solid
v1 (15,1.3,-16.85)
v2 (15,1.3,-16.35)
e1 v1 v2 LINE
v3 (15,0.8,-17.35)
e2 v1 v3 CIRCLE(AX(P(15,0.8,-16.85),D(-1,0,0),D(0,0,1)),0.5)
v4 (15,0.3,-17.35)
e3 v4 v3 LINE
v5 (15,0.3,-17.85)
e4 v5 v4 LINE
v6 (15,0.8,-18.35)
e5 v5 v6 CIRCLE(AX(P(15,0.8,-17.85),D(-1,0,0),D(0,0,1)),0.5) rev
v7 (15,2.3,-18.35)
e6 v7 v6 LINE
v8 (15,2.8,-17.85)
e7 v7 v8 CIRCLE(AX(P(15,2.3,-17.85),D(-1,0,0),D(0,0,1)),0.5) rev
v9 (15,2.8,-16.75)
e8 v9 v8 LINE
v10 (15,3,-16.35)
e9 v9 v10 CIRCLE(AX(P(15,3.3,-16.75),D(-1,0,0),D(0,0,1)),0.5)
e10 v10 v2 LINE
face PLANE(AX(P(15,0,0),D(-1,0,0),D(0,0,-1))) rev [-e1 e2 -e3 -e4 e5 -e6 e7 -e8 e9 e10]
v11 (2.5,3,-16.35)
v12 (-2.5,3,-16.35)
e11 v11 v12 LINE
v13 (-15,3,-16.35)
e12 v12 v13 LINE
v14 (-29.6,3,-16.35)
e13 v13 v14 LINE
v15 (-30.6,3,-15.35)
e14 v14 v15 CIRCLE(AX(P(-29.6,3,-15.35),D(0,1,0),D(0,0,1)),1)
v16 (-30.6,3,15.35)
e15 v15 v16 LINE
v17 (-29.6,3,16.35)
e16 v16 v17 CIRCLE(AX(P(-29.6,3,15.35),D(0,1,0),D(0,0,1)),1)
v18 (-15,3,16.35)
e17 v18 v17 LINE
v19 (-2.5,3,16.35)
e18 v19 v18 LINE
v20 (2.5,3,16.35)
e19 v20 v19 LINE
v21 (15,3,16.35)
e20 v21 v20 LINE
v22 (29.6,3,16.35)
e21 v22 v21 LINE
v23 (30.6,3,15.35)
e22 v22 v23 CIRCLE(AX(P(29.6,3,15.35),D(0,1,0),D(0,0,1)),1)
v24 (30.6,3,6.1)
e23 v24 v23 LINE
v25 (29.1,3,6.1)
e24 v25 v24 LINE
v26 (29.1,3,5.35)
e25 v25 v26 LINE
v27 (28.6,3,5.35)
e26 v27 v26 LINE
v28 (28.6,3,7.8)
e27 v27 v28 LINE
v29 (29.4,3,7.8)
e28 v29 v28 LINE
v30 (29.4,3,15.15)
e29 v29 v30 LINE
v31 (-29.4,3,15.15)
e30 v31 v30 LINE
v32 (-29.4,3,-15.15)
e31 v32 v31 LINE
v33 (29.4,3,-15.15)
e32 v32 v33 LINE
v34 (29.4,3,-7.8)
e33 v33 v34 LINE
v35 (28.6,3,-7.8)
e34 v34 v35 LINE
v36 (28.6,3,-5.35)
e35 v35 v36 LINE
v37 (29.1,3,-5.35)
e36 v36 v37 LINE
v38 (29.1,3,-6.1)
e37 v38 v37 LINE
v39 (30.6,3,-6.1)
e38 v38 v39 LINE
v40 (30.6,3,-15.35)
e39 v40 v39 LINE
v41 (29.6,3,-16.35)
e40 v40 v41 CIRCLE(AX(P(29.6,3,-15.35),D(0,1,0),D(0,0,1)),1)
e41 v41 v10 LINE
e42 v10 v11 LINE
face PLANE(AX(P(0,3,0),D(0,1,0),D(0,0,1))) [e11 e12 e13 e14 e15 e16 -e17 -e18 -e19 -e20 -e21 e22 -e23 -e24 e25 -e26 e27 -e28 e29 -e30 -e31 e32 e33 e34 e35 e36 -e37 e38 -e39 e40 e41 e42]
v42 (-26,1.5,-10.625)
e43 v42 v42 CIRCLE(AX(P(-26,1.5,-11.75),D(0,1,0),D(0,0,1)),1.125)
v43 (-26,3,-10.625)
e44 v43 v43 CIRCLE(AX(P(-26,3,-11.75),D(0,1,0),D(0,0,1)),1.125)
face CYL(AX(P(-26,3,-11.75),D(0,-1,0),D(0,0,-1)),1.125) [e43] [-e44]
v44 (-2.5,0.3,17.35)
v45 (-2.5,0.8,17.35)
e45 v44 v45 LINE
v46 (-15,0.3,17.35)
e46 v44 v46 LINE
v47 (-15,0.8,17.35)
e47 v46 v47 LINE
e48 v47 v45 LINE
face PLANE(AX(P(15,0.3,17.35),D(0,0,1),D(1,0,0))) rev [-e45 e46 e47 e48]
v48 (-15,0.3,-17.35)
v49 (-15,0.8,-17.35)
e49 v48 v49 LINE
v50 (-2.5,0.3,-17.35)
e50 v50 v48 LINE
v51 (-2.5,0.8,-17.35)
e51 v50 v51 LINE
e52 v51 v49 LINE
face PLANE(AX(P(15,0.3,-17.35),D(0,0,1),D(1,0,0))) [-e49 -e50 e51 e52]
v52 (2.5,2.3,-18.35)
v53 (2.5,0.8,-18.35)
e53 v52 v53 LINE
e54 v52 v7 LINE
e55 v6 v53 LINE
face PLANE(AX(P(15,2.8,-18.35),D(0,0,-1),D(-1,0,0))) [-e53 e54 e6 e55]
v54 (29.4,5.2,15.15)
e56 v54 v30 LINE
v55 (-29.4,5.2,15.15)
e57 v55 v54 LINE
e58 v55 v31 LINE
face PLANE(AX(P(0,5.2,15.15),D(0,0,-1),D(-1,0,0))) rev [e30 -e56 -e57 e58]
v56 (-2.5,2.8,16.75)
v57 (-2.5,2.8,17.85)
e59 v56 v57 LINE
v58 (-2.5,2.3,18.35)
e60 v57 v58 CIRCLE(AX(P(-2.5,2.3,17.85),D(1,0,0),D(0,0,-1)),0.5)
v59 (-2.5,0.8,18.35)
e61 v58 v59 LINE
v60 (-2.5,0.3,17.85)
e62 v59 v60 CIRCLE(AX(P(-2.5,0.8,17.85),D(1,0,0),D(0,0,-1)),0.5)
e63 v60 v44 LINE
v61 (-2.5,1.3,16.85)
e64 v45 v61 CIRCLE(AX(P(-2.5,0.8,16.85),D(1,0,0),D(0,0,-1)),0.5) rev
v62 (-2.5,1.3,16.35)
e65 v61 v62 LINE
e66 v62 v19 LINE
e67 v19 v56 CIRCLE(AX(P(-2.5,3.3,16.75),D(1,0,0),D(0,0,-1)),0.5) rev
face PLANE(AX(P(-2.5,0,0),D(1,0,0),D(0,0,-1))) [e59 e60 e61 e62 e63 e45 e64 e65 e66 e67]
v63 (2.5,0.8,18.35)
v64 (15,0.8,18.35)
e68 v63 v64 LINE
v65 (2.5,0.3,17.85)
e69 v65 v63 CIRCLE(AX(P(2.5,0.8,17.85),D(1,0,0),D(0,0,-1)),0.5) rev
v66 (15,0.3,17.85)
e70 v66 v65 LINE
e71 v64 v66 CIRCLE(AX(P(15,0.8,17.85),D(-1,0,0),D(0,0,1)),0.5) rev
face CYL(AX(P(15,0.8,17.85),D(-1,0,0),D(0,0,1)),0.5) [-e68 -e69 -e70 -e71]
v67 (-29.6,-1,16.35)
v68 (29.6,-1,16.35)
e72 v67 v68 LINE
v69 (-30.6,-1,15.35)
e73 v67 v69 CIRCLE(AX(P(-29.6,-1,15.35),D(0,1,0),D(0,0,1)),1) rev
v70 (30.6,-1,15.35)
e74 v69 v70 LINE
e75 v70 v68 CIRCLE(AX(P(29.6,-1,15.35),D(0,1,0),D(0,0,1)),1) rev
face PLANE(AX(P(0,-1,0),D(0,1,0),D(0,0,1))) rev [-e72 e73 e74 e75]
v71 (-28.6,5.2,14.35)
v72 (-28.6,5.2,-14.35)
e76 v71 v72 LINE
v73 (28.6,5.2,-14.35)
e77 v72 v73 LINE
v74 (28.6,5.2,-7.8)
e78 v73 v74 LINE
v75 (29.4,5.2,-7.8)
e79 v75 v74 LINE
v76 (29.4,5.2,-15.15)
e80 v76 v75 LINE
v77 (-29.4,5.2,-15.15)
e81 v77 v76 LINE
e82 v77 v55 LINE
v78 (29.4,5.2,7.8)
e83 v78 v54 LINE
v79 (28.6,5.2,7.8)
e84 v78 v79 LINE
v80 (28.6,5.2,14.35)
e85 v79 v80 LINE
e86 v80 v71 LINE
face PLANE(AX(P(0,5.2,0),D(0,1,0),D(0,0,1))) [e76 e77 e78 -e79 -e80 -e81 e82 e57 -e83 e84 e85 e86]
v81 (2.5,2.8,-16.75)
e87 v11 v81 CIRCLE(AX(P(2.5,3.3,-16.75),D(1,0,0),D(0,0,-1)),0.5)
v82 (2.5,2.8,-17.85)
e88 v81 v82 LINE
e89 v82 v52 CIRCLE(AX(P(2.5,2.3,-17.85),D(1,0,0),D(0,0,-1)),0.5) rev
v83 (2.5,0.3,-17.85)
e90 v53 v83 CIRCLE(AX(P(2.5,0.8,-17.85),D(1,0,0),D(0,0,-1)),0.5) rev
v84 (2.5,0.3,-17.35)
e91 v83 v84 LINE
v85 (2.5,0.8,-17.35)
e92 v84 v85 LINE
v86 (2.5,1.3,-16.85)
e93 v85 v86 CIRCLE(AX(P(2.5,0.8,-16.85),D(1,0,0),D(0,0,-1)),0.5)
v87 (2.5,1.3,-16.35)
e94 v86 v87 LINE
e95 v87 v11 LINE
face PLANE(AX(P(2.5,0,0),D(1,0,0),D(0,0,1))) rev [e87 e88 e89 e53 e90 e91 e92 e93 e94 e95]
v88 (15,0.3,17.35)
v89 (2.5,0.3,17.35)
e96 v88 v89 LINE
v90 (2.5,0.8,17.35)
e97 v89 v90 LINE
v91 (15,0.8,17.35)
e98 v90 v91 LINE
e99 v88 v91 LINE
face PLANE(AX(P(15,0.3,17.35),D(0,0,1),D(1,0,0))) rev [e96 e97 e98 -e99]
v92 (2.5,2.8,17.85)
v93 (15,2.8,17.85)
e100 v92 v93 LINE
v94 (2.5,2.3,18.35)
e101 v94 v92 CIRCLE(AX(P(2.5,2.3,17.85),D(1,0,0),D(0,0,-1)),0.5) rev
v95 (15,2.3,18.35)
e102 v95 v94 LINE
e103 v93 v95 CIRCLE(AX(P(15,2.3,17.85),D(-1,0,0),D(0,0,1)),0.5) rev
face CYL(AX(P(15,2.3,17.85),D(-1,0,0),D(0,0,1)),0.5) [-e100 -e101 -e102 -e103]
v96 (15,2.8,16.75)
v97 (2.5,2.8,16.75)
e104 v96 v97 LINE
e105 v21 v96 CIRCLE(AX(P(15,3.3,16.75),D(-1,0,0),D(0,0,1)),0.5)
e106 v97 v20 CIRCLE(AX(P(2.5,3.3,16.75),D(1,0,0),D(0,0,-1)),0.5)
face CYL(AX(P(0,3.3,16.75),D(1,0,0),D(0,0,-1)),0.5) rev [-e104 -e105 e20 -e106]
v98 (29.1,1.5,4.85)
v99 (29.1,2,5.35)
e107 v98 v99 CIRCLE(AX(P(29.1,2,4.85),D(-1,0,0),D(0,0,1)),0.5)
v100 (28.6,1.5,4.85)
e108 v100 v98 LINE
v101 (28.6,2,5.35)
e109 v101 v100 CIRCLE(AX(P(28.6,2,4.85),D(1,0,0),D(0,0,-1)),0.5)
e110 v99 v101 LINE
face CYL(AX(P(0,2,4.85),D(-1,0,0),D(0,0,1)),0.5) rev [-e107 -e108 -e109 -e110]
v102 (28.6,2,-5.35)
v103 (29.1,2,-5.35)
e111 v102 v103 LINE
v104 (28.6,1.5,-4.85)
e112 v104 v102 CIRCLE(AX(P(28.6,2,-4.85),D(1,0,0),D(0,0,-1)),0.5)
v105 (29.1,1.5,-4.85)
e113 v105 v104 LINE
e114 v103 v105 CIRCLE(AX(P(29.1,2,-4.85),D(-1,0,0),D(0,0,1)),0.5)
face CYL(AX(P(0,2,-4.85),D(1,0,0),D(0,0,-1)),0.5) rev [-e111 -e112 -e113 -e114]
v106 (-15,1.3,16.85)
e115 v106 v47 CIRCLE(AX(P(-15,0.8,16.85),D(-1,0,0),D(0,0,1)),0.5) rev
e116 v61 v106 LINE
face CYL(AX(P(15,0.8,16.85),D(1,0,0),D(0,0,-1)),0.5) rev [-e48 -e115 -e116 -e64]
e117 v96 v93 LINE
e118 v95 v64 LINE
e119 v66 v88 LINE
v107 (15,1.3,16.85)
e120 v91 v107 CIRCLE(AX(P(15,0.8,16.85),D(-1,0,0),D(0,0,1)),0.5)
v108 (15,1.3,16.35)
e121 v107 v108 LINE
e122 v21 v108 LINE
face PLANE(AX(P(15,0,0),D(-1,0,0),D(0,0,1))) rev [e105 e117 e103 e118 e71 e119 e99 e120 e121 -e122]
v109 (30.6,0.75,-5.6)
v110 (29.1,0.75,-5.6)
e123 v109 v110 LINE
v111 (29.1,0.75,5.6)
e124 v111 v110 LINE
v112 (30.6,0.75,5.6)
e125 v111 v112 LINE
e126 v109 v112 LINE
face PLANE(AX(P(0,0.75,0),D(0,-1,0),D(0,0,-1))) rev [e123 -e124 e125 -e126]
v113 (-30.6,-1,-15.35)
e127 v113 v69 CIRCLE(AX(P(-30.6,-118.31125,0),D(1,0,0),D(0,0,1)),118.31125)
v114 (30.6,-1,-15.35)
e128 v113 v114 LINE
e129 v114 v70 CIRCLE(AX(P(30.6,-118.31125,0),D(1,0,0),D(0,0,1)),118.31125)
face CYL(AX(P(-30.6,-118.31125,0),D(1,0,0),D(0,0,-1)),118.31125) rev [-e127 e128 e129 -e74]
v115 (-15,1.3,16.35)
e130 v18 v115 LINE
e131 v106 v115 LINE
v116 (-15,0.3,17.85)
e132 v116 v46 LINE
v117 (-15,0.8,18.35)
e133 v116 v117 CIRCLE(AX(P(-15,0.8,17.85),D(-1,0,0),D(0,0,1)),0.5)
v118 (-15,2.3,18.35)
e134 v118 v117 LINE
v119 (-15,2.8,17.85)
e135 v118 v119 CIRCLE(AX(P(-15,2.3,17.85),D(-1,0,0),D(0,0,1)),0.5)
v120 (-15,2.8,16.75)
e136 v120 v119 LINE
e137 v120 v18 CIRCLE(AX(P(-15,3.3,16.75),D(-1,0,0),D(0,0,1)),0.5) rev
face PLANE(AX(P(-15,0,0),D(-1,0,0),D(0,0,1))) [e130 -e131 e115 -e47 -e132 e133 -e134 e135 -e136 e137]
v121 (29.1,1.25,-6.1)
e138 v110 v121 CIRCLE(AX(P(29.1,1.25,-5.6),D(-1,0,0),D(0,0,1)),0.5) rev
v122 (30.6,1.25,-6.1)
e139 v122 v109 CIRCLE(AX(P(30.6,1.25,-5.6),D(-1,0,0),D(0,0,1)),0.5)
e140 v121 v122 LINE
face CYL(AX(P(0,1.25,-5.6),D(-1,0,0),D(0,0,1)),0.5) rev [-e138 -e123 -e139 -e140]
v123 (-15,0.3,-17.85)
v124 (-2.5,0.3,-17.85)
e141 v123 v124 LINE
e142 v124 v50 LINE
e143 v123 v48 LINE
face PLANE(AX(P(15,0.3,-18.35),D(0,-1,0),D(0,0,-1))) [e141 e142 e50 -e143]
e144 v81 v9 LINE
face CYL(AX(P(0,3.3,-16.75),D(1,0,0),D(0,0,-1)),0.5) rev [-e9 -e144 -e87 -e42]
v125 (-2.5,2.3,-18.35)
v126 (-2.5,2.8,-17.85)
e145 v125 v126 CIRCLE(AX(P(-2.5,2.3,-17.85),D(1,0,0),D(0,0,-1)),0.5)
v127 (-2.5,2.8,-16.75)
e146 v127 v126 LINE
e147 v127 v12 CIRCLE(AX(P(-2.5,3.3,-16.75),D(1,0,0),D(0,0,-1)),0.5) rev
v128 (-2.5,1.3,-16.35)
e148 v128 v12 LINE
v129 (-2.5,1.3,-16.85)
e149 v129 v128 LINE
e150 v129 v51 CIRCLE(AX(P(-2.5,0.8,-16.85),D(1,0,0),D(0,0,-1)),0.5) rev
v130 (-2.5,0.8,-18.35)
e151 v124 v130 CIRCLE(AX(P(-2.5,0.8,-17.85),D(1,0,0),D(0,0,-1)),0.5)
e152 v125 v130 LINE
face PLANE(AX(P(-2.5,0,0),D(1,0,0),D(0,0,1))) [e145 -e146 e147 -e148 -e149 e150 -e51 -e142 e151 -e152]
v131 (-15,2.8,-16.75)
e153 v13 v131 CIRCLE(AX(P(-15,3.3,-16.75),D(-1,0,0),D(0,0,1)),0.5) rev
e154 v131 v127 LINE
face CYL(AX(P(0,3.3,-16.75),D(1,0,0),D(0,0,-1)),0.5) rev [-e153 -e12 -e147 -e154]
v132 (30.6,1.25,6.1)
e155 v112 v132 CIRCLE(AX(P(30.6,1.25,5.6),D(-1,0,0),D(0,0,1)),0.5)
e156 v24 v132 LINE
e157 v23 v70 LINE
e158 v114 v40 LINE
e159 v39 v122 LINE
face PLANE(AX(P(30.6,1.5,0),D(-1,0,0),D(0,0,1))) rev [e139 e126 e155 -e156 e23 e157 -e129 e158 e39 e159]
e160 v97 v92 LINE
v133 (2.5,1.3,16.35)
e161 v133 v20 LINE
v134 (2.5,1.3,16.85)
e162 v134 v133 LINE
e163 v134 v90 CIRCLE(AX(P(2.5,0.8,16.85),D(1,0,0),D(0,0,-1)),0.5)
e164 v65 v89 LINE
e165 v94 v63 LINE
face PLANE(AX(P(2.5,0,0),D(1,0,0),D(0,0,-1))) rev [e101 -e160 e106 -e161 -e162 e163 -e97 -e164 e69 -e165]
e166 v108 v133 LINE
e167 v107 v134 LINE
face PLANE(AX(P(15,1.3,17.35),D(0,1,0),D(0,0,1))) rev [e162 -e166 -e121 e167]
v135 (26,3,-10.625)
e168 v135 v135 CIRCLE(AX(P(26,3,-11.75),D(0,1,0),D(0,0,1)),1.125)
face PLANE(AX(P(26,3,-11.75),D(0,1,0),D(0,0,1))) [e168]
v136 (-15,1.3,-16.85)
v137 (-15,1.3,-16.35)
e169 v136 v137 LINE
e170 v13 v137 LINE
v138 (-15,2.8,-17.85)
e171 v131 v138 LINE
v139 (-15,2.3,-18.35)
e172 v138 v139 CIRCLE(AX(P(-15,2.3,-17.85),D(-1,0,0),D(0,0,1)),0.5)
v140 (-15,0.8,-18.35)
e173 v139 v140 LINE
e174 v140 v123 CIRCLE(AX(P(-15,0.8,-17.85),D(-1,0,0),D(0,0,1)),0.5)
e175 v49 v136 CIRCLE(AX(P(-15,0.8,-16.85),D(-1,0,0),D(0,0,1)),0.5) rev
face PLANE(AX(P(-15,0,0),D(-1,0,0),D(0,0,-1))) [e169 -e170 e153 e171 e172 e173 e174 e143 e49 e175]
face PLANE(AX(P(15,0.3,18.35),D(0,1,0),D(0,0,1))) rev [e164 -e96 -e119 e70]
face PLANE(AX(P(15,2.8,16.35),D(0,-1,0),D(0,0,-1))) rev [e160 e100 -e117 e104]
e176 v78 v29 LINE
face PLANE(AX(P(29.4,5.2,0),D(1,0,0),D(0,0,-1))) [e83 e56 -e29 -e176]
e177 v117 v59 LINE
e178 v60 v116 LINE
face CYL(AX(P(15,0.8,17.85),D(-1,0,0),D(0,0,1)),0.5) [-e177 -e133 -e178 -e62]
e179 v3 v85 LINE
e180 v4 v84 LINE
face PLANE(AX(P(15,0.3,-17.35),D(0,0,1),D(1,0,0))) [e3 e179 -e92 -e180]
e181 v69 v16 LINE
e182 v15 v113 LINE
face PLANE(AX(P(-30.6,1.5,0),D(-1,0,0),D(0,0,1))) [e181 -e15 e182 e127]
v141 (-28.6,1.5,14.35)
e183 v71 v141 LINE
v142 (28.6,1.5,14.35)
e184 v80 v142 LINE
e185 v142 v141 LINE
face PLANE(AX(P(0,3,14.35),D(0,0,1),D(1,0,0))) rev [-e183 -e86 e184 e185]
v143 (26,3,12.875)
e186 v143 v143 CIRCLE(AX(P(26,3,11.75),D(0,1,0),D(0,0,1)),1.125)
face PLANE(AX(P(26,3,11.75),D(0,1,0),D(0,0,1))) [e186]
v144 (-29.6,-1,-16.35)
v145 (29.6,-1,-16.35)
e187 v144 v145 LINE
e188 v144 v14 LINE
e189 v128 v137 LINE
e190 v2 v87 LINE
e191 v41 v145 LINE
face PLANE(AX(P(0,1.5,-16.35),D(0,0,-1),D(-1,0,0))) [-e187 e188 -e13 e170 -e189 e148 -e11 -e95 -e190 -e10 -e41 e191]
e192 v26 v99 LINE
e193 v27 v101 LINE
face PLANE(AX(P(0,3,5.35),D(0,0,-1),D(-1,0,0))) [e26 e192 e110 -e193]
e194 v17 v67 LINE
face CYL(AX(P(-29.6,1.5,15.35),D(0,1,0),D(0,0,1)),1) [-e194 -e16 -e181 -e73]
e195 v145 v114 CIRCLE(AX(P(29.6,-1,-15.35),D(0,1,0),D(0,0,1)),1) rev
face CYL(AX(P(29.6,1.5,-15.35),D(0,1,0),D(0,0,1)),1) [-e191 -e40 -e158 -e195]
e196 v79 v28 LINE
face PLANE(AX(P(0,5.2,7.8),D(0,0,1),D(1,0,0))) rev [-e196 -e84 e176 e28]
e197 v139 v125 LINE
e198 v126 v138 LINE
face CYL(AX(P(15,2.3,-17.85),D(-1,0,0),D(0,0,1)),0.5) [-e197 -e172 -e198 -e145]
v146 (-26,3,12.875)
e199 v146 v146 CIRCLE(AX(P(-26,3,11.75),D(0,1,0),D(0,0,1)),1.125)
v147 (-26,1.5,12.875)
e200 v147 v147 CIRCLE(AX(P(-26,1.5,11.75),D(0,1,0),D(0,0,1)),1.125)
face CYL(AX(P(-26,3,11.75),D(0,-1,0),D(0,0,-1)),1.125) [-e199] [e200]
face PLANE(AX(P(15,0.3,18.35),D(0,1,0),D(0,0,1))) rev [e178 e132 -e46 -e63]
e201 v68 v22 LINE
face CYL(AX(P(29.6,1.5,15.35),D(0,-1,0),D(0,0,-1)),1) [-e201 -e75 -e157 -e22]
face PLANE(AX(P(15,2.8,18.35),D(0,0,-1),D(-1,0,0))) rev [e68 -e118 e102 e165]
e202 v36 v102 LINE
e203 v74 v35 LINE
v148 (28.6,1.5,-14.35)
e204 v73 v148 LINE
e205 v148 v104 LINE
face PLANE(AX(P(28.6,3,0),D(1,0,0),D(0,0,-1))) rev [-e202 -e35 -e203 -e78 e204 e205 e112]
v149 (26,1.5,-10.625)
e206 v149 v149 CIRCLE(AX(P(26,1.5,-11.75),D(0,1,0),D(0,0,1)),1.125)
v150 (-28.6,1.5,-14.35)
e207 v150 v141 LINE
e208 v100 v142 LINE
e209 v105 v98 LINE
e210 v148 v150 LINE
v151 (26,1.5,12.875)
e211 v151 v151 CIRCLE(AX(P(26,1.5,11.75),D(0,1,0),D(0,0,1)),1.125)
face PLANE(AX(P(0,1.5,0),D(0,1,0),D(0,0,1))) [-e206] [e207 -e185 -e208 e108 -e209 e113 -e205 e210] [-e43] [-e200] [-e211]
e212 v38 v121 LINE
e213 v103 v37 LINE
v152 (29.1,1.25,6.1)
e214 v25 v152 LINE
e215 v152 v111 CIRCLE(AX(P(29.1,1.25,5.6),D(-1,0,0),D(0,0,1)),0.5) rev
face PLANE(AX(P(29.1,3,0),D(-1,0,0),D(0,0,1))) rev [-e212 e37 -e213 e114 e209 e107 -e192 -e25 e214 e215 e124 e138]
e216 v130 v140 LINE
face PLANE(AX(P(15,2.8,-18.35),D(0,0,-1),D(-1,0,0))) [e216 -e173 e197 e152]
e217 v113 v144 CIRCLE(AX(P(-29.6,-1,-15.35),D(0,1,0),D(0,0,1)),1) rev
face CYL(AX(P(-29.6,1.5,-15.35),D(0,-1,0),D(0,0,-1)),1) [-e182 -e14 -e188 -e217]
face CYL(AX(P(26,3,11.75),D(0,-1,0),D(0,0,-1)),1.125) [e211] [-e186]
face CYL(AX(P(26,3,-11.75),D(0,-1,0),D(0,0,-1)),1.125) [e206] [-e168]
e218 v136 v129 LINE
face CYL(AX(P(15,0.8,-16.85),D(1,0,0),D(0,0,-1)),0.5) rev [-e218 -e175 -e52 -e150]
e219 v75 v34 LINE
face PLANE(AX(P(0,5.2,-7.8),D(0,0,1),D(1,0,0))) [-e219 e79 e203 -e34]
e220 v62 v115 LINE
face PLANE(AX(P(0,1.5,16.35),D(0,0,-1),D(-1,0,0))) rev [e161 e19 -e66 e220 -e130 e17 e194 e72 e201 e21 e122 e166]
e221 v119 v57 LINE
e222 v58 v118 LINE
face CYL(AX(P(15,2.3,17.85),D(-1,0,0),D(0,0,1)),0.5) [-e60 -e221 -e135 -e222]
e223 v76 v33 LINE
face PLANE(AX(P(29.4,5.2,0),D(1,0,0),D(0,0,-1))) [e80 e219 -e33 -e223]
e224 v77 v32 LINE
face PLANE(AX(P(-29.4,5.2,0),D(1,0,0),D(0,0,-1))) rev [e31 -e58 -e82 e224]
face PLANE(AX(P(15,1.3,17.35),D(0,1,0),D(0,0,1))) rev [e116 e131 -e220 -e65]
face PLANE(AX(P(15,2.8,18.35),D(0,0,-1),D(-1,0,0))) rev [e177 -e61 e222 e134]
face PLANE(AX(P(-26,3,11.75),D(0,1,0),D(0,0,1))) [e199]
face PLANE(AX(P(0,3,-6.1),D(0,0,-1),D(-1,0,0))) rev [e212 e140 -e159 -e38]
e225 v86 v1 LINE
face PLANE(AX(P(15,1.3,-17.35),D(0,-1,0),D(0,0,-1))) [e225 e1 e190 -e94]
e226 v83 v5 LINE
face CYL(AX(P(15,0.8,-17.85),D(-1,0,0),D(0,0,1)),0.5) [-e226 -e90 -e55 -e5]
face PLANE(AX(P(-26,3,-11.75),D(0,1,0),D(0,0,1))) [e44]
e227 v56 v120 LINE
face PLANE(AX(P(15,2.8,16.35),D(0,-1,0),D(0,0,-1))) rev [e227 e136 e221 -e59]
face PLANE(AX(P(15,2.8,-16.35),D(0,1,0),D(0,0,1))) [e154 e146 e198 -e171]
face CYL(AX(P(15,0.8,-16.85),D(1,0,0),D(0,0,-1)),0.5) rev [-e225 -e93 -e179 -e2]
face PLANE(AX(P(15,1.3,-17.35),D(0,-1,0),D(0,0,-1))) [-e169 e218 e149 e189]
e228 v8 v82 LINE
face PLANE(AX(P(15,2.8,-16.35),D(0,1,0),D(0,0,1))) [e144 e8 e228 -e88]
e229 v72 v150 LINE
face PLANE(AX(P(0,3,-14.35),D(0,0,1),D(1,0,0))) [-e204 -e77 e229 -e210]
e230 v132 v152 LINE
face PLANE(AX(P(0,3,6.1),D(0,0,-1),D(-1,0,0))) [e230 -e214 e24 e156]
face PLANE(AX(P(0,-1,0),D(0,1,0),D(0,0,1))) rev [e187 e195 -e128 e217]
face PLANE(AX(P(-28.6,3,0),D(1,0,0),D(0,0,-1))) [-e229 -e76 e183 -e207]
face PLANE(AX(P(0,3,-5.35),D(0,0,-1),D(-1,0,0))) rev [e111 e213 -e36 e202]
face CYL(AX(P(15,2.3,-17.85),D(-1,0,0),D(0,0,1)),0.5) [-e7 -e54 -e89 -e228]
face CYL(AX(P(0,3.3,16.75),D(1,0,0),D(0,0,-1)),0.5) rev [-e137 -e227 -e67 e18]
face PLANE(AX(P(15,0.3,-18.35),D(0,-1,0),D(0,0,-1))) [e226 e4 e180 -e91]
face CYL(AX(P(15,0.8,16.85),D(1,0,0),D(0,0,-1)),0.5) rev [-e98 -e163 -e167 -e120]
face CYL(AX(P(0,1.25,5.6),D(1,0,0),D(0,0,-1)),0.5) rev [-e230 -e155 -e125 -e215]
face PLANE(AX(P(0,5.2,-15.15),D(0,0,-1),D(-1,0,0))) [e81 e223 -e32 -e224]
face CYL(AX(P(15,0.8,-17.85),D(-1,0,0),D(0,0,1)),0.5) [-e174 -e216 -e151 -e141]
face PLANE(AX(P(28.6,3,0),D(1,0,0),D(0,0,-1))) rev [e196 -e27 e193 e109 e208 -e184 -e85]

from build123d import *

# Parameters (mm, degrees)
SKETCH2_W               = 61.2
SKETCH2_H               = 32.7
BOSS_EXTRUDE1_DEPTH     = 1.5
BOSS_EXTRUDE2_START     = 1.5
SKETCH2_3_R             = 1.125
BOSS_EXTRUDE2_DEPTH     = 1.5
SKETCH2_7_W             = 61.2
SKETCH2_7_H             = 32.7
BOSS_EXTRUDE5_DEPTH     = 1
FILLET1_R               = 1
CUT_EXTRUDE2_DEPTH      = 35.823591142
CUT_EXTRUDE2_DEPTH_BACK = 0.75
CUT_EXTRUDE2_START      = 1.5
SKETCH2_5_W             = 1.5
SKETCH2_5_H             = 0.75
SKETCH2_5_H_2           = 10.7
FILLET3_R               = 0.5
BOSS_EXTRUDE4_DEPTH     = 2.2
BOSS_EXTRUDE6_DEPTH     = 15
CUT_EXTRUDE4_DEPTH      = 2.5
FILLET4_R               = 0.5
FILLET4_OF_MIRROR1_R    = 0.5
FILLET5_R               = 0.5
CUT_EXTRUDE5_DEPTH      = 37.057211484
CUT_EXTRUDE5_DEPTH_BACK = 37.057211484


with BuildPart() as part:
    # Sketch2 → Boss-Extrude1 (new body)
    with BuildSketch(Plane(origin=(0, 0, 0), x_dir=(1, 0, 0), z_dir=(0, 1, 0))):
        Rectangle(SKETCH2_W, SKETCH2_H)
    extrude(amount=BOSS_EXTRUDE1_DEPTH)

    # Sketch2<3> → Boss-Extrude2 (add)
    with BuildSketch(Plane(origin=(0, 0, 0), x_dir=(1, 0, 0), z_dir=(0, 1, 0)).offset(BOSS_EXTRUDE2_START)):
        Polygon((-30.6, 16.35), (-30.6, -16.35), (30.6, -16.35), (30.6, -6.1), (29.1, -6.1), (29.1, -5.35), (28.6, -5.35), (28.6, -14.35), (-28.6, -14.35), (-28.6, 14.35), (28.6, 14.35), (28.6, 5.35), (30.6, 5.35), (30.6, 16.35), align=None)
        with Locations(Location((-26, 11.75, 0), (0, 0, 270))):
            Circle(SKETCH2_3_R)
        with Locations(Location((-26, -11.75, 0), (0, 0, 270))):
            Circle(SKETCH2_3_R)
        with Locations(Location((26, -11.75, 0), (0, 0, 270))):
            Circle(SKETCH2_3_R)
        with Locations(Location((26, 11.75, 0), (0, 0, 270))):
            Circle(SKETCH2_3_R)
    extrude(amount=BOSS_EXTRUDE2_DEPTH)

    # Sketch2<7> → Boss-Extrude5 (add)
    with BuildSketch(Plane(origin=(0, 0, 0), x_dir=(1, 0, 0), z_dir=(0, 1, 0))):
        Rectangle(SKETCH2_7_W, SKETCH2_7_H)
    extrude(amount=-BOSS_EXTRUDE5_DEPTH)

    # Fillet1
    fillet1_edges = [part.edges().sort_by_distance(p)[0] for p in [
        (-30.6, 1, -16.35),
        (30.6, 1, -16.35),
        (30.6, 1, 16.35),
        (-30.6, 1, 16.35),
    ]]
    fillet(fillet1_edges, radius=FILLET1_R)

    # Sketch2<5> → Cut-Extrude2 (cut, two sides: drawn at the far end of the back side and taken through both)
    with BuildSketch(Plane(origin=(0, 0, 0), x_dir=(1, 0, 0), z_dir=(0, 1, 0)).offset(CUT_EXTRUDE2_START - CUT_EXTRUDE2_DEPTH_BACK)):
        with Locations((29.85, 5.725)):
            Rectangle(SKETCH2_5_W, SKETCH2_5_H)
        with Locations((29.85, 0)):
            Rectangle(SKETCH2_5_W, SKETCH2_5_H_2)
        with Locations((29.85, -5.725)):
            Rectangle(SKETCH2_5_W, SKETCH2_5_H)
    extrude(amount=CUT_EXTRUDE2_DEPTH + CUT_EXTRUDE2_DEPTH_BACK, mode=Mode.SUBTRACT)

    # Fillet3
    fillet3_edges = [part.edges().sort_by_distance(p)[0] for p in [
        (29.85, 0.75, 6.1),
        (29.85, 0.75, -6.1),
        (28.85, 1.5, -5.35),
        (28.85, 1.5, 5.35),
    ]]
    fillet(fillet3_edges, radius=FILLET3_R)

    # Sketch4 → Boss-Extrude4 (add)
    with BuildSketch(Plane(origin=(0, 3, 0), x_dir=(1, 0, 0), z_dir=(0, 1, 0))):
        Polygon((29.4, 15.15), (-29.4, 15.15), (-29.4, -15.15), (29.4, -15.15), (29.4, -7.8), (28.6, -7.8), (28.6, -14.35), (-28.6, -14.35), (-28.6, 14.35), (28.6, 14.35), (28.6, 7.8), (29.4, 7.8), align=None)
    extrude(amount=BOSS_EXTRUDE4_DEPTH)

    # Sketch5 → Boss-Extrude6 (add, symmetric)
    with BuildSketch(Plane(origin=(0, 0, 0), x_dir=(0, 0, -1), z_dir=(1, 0, 0))):
        Polygon((-16.35, 2.8), (-18.35, 2.8), (-18.35, 0.3), (-17.35, 0.3), (-17.35, 1.3), (-16.35, 1.3), align=None)
    boss_extrude6 = extrude(amount=BOSS_EXTRUDE6_DEPTH, both=True)

    # Sketch5<3> → Cut-Extrude4 (cut, symmetric)
    with BuildSketch(Plane(origin=(0, 0, 0), x_dir=(0, 0, -1), z_dir=(1, 0, 0))):
        Polygon((-16.35, 2.8), (-18.35, 2.8), (-18.35, 0.3), (-17.35, 0.3), (-17.35, 1.3), (-16.35, 1.3), align=None)
    cut_extrude4 = extrude(amount=CUT_EXTRUDE4_DEPTH, both=True, mode=Mode.SUBTRACT)

    # Fillet4
    fillet4_edges = [part.edges().sort_by_distance(p)[0] for p in [
        (8.75, 1.3, 17.35),
        (8.75, 2.8, 18.35),
        (8.75, 0.3, 18.35),
        (-8.75, 0.3, 18.35),
        (-8.75, 2.8, 18.35),
        (-8.75, 1.3, 17.35),
    ]]
    fillet(fillet4_edges, radius=FILLET4_R)

    # Mirror1: Boss-Extrude6, Cut-Extrude4 across plane
    add(boss_extrude6.mirror(Plane.XY))
    add(cut_extrude4.mirror(Plane.XY), mode=Mode.SUBTRACT)

    # Fillet4 of Mirror1
    fillet4_of_mirror1_edges = [part.edges().sort_by_distance(p)[0] for p in [
        (8.75, 1.3, -17.35),
        (8.75, 2.8, -18.35),
        (8.75, 0.3, -18.35),
        (-8.75, 0.3, -18.35),
        (-8.75, 2.8, -18.35),
        (-8.75, 1.3, -17.35),
    ]]
    fillet(fillet4_of_mirror1_edges, radius=FILLET4_OF_MIRROR1_R)

    # Fillet5
    # the kernel refuses this fillet: 0.5 mm, written as the material it adds along each edge
    with BuildSketch(Plane(origin=(15, 2.8, 16.35), x_dir=(0, 1.0, 2.6076918401885707e-11), z_dir=(-1, 0, 0)), Plane(origin=(-2.5, 2.8, 16.35), x_dir=(0, 1.0, 2.6076918401885707e-11), z_dir=(-1, 0, 0))) as fillet5_piece_1:
        with BuildLine():
            CenterArc((0.5, -0.4), FILLET5_R, 126.869897647, 53.130102355)
            Line((0, -0.4), (-0.01, -0.4))
            Line((-0.01, -0.4), (-0.01, 0))
            Line((-0.01, 0), (0, 0.01))
            ThreePointArc((0, 0.01), (0.1, 0.01), (0.194, 0.008))
            Line((0.194, 0.008), (0.2, 0))
        make_face()
    extrude(amount=12.5)
    with BuildSketch(Plane(origin=(15, 2.8, -16.35), x_dir=(0, 0, -1), z_dir=(-1, 0, 0))) as fillet5_piece_2:
        with BuildLine():
            CenterArc((0.4, -0.5), FILLET5_R, 90, 53.130102355)
            Line((0, -0.2), (-0.008, -0.194))
            ThreePointArc((-0.008, -0.194), (-0.01, -0.1), (-0.01, 0))
            Line((-0.01, 0), (0, 0.01))
            Line((0, 0.01), (0.4, 0.01))
            Line((0.4, 0.01), (0.4, 0))
        make_face()
    extrude(amount=12.5)
    with BuildSketch(Plane(origin=(-2.5, 2.8, -16.35), x_dir=(0, 1.0, -2.6112445538673017e-11), z_dir=(-1, 0, 0))) as fillet5_piece_3:
        with BuildLine():
            CenterArc((0.5, 0.4), FILLET5_R, 179.999999999, 53.130102355)
            Line((0, 0.4), (-0.01, 0.4))
            Line((-0.01, 0.4), (-0.01, 0))
            Line((-0.01, 0), (0, -0.01))
            ThreePointArc((0, -0.01), (0.1, -0.01), (0.194, -0.008))
            Line((0.194, -0.008), (0.2, 0))
        make_face()
    extrude(amount=12.5)

    # Sketch6 → Cut-Extrude5 (cut, two sides: drawn at the far end of the back side and taken through both)
    with BuildSketch(Plane(origin=(0, 0, 0), x_dir=(0, 0, -1), z_dir=(1, 0, 0)).offset(-CUT_EXTRUDE5_DEPTH_BACK)):
        with BuildLine():
            Line((-15.35, -1), (15.35, -1))
            ThreePointArc((15.35, -1), (0, 0), (-15.35, -1))
        make_face()
    extrude(amount=CUT_EXTRUDE5_DEPTH + CUT_EXTRUDE5_DEPTH_BACK, mode=Mode.SUBTRACT)


solid = part.part
